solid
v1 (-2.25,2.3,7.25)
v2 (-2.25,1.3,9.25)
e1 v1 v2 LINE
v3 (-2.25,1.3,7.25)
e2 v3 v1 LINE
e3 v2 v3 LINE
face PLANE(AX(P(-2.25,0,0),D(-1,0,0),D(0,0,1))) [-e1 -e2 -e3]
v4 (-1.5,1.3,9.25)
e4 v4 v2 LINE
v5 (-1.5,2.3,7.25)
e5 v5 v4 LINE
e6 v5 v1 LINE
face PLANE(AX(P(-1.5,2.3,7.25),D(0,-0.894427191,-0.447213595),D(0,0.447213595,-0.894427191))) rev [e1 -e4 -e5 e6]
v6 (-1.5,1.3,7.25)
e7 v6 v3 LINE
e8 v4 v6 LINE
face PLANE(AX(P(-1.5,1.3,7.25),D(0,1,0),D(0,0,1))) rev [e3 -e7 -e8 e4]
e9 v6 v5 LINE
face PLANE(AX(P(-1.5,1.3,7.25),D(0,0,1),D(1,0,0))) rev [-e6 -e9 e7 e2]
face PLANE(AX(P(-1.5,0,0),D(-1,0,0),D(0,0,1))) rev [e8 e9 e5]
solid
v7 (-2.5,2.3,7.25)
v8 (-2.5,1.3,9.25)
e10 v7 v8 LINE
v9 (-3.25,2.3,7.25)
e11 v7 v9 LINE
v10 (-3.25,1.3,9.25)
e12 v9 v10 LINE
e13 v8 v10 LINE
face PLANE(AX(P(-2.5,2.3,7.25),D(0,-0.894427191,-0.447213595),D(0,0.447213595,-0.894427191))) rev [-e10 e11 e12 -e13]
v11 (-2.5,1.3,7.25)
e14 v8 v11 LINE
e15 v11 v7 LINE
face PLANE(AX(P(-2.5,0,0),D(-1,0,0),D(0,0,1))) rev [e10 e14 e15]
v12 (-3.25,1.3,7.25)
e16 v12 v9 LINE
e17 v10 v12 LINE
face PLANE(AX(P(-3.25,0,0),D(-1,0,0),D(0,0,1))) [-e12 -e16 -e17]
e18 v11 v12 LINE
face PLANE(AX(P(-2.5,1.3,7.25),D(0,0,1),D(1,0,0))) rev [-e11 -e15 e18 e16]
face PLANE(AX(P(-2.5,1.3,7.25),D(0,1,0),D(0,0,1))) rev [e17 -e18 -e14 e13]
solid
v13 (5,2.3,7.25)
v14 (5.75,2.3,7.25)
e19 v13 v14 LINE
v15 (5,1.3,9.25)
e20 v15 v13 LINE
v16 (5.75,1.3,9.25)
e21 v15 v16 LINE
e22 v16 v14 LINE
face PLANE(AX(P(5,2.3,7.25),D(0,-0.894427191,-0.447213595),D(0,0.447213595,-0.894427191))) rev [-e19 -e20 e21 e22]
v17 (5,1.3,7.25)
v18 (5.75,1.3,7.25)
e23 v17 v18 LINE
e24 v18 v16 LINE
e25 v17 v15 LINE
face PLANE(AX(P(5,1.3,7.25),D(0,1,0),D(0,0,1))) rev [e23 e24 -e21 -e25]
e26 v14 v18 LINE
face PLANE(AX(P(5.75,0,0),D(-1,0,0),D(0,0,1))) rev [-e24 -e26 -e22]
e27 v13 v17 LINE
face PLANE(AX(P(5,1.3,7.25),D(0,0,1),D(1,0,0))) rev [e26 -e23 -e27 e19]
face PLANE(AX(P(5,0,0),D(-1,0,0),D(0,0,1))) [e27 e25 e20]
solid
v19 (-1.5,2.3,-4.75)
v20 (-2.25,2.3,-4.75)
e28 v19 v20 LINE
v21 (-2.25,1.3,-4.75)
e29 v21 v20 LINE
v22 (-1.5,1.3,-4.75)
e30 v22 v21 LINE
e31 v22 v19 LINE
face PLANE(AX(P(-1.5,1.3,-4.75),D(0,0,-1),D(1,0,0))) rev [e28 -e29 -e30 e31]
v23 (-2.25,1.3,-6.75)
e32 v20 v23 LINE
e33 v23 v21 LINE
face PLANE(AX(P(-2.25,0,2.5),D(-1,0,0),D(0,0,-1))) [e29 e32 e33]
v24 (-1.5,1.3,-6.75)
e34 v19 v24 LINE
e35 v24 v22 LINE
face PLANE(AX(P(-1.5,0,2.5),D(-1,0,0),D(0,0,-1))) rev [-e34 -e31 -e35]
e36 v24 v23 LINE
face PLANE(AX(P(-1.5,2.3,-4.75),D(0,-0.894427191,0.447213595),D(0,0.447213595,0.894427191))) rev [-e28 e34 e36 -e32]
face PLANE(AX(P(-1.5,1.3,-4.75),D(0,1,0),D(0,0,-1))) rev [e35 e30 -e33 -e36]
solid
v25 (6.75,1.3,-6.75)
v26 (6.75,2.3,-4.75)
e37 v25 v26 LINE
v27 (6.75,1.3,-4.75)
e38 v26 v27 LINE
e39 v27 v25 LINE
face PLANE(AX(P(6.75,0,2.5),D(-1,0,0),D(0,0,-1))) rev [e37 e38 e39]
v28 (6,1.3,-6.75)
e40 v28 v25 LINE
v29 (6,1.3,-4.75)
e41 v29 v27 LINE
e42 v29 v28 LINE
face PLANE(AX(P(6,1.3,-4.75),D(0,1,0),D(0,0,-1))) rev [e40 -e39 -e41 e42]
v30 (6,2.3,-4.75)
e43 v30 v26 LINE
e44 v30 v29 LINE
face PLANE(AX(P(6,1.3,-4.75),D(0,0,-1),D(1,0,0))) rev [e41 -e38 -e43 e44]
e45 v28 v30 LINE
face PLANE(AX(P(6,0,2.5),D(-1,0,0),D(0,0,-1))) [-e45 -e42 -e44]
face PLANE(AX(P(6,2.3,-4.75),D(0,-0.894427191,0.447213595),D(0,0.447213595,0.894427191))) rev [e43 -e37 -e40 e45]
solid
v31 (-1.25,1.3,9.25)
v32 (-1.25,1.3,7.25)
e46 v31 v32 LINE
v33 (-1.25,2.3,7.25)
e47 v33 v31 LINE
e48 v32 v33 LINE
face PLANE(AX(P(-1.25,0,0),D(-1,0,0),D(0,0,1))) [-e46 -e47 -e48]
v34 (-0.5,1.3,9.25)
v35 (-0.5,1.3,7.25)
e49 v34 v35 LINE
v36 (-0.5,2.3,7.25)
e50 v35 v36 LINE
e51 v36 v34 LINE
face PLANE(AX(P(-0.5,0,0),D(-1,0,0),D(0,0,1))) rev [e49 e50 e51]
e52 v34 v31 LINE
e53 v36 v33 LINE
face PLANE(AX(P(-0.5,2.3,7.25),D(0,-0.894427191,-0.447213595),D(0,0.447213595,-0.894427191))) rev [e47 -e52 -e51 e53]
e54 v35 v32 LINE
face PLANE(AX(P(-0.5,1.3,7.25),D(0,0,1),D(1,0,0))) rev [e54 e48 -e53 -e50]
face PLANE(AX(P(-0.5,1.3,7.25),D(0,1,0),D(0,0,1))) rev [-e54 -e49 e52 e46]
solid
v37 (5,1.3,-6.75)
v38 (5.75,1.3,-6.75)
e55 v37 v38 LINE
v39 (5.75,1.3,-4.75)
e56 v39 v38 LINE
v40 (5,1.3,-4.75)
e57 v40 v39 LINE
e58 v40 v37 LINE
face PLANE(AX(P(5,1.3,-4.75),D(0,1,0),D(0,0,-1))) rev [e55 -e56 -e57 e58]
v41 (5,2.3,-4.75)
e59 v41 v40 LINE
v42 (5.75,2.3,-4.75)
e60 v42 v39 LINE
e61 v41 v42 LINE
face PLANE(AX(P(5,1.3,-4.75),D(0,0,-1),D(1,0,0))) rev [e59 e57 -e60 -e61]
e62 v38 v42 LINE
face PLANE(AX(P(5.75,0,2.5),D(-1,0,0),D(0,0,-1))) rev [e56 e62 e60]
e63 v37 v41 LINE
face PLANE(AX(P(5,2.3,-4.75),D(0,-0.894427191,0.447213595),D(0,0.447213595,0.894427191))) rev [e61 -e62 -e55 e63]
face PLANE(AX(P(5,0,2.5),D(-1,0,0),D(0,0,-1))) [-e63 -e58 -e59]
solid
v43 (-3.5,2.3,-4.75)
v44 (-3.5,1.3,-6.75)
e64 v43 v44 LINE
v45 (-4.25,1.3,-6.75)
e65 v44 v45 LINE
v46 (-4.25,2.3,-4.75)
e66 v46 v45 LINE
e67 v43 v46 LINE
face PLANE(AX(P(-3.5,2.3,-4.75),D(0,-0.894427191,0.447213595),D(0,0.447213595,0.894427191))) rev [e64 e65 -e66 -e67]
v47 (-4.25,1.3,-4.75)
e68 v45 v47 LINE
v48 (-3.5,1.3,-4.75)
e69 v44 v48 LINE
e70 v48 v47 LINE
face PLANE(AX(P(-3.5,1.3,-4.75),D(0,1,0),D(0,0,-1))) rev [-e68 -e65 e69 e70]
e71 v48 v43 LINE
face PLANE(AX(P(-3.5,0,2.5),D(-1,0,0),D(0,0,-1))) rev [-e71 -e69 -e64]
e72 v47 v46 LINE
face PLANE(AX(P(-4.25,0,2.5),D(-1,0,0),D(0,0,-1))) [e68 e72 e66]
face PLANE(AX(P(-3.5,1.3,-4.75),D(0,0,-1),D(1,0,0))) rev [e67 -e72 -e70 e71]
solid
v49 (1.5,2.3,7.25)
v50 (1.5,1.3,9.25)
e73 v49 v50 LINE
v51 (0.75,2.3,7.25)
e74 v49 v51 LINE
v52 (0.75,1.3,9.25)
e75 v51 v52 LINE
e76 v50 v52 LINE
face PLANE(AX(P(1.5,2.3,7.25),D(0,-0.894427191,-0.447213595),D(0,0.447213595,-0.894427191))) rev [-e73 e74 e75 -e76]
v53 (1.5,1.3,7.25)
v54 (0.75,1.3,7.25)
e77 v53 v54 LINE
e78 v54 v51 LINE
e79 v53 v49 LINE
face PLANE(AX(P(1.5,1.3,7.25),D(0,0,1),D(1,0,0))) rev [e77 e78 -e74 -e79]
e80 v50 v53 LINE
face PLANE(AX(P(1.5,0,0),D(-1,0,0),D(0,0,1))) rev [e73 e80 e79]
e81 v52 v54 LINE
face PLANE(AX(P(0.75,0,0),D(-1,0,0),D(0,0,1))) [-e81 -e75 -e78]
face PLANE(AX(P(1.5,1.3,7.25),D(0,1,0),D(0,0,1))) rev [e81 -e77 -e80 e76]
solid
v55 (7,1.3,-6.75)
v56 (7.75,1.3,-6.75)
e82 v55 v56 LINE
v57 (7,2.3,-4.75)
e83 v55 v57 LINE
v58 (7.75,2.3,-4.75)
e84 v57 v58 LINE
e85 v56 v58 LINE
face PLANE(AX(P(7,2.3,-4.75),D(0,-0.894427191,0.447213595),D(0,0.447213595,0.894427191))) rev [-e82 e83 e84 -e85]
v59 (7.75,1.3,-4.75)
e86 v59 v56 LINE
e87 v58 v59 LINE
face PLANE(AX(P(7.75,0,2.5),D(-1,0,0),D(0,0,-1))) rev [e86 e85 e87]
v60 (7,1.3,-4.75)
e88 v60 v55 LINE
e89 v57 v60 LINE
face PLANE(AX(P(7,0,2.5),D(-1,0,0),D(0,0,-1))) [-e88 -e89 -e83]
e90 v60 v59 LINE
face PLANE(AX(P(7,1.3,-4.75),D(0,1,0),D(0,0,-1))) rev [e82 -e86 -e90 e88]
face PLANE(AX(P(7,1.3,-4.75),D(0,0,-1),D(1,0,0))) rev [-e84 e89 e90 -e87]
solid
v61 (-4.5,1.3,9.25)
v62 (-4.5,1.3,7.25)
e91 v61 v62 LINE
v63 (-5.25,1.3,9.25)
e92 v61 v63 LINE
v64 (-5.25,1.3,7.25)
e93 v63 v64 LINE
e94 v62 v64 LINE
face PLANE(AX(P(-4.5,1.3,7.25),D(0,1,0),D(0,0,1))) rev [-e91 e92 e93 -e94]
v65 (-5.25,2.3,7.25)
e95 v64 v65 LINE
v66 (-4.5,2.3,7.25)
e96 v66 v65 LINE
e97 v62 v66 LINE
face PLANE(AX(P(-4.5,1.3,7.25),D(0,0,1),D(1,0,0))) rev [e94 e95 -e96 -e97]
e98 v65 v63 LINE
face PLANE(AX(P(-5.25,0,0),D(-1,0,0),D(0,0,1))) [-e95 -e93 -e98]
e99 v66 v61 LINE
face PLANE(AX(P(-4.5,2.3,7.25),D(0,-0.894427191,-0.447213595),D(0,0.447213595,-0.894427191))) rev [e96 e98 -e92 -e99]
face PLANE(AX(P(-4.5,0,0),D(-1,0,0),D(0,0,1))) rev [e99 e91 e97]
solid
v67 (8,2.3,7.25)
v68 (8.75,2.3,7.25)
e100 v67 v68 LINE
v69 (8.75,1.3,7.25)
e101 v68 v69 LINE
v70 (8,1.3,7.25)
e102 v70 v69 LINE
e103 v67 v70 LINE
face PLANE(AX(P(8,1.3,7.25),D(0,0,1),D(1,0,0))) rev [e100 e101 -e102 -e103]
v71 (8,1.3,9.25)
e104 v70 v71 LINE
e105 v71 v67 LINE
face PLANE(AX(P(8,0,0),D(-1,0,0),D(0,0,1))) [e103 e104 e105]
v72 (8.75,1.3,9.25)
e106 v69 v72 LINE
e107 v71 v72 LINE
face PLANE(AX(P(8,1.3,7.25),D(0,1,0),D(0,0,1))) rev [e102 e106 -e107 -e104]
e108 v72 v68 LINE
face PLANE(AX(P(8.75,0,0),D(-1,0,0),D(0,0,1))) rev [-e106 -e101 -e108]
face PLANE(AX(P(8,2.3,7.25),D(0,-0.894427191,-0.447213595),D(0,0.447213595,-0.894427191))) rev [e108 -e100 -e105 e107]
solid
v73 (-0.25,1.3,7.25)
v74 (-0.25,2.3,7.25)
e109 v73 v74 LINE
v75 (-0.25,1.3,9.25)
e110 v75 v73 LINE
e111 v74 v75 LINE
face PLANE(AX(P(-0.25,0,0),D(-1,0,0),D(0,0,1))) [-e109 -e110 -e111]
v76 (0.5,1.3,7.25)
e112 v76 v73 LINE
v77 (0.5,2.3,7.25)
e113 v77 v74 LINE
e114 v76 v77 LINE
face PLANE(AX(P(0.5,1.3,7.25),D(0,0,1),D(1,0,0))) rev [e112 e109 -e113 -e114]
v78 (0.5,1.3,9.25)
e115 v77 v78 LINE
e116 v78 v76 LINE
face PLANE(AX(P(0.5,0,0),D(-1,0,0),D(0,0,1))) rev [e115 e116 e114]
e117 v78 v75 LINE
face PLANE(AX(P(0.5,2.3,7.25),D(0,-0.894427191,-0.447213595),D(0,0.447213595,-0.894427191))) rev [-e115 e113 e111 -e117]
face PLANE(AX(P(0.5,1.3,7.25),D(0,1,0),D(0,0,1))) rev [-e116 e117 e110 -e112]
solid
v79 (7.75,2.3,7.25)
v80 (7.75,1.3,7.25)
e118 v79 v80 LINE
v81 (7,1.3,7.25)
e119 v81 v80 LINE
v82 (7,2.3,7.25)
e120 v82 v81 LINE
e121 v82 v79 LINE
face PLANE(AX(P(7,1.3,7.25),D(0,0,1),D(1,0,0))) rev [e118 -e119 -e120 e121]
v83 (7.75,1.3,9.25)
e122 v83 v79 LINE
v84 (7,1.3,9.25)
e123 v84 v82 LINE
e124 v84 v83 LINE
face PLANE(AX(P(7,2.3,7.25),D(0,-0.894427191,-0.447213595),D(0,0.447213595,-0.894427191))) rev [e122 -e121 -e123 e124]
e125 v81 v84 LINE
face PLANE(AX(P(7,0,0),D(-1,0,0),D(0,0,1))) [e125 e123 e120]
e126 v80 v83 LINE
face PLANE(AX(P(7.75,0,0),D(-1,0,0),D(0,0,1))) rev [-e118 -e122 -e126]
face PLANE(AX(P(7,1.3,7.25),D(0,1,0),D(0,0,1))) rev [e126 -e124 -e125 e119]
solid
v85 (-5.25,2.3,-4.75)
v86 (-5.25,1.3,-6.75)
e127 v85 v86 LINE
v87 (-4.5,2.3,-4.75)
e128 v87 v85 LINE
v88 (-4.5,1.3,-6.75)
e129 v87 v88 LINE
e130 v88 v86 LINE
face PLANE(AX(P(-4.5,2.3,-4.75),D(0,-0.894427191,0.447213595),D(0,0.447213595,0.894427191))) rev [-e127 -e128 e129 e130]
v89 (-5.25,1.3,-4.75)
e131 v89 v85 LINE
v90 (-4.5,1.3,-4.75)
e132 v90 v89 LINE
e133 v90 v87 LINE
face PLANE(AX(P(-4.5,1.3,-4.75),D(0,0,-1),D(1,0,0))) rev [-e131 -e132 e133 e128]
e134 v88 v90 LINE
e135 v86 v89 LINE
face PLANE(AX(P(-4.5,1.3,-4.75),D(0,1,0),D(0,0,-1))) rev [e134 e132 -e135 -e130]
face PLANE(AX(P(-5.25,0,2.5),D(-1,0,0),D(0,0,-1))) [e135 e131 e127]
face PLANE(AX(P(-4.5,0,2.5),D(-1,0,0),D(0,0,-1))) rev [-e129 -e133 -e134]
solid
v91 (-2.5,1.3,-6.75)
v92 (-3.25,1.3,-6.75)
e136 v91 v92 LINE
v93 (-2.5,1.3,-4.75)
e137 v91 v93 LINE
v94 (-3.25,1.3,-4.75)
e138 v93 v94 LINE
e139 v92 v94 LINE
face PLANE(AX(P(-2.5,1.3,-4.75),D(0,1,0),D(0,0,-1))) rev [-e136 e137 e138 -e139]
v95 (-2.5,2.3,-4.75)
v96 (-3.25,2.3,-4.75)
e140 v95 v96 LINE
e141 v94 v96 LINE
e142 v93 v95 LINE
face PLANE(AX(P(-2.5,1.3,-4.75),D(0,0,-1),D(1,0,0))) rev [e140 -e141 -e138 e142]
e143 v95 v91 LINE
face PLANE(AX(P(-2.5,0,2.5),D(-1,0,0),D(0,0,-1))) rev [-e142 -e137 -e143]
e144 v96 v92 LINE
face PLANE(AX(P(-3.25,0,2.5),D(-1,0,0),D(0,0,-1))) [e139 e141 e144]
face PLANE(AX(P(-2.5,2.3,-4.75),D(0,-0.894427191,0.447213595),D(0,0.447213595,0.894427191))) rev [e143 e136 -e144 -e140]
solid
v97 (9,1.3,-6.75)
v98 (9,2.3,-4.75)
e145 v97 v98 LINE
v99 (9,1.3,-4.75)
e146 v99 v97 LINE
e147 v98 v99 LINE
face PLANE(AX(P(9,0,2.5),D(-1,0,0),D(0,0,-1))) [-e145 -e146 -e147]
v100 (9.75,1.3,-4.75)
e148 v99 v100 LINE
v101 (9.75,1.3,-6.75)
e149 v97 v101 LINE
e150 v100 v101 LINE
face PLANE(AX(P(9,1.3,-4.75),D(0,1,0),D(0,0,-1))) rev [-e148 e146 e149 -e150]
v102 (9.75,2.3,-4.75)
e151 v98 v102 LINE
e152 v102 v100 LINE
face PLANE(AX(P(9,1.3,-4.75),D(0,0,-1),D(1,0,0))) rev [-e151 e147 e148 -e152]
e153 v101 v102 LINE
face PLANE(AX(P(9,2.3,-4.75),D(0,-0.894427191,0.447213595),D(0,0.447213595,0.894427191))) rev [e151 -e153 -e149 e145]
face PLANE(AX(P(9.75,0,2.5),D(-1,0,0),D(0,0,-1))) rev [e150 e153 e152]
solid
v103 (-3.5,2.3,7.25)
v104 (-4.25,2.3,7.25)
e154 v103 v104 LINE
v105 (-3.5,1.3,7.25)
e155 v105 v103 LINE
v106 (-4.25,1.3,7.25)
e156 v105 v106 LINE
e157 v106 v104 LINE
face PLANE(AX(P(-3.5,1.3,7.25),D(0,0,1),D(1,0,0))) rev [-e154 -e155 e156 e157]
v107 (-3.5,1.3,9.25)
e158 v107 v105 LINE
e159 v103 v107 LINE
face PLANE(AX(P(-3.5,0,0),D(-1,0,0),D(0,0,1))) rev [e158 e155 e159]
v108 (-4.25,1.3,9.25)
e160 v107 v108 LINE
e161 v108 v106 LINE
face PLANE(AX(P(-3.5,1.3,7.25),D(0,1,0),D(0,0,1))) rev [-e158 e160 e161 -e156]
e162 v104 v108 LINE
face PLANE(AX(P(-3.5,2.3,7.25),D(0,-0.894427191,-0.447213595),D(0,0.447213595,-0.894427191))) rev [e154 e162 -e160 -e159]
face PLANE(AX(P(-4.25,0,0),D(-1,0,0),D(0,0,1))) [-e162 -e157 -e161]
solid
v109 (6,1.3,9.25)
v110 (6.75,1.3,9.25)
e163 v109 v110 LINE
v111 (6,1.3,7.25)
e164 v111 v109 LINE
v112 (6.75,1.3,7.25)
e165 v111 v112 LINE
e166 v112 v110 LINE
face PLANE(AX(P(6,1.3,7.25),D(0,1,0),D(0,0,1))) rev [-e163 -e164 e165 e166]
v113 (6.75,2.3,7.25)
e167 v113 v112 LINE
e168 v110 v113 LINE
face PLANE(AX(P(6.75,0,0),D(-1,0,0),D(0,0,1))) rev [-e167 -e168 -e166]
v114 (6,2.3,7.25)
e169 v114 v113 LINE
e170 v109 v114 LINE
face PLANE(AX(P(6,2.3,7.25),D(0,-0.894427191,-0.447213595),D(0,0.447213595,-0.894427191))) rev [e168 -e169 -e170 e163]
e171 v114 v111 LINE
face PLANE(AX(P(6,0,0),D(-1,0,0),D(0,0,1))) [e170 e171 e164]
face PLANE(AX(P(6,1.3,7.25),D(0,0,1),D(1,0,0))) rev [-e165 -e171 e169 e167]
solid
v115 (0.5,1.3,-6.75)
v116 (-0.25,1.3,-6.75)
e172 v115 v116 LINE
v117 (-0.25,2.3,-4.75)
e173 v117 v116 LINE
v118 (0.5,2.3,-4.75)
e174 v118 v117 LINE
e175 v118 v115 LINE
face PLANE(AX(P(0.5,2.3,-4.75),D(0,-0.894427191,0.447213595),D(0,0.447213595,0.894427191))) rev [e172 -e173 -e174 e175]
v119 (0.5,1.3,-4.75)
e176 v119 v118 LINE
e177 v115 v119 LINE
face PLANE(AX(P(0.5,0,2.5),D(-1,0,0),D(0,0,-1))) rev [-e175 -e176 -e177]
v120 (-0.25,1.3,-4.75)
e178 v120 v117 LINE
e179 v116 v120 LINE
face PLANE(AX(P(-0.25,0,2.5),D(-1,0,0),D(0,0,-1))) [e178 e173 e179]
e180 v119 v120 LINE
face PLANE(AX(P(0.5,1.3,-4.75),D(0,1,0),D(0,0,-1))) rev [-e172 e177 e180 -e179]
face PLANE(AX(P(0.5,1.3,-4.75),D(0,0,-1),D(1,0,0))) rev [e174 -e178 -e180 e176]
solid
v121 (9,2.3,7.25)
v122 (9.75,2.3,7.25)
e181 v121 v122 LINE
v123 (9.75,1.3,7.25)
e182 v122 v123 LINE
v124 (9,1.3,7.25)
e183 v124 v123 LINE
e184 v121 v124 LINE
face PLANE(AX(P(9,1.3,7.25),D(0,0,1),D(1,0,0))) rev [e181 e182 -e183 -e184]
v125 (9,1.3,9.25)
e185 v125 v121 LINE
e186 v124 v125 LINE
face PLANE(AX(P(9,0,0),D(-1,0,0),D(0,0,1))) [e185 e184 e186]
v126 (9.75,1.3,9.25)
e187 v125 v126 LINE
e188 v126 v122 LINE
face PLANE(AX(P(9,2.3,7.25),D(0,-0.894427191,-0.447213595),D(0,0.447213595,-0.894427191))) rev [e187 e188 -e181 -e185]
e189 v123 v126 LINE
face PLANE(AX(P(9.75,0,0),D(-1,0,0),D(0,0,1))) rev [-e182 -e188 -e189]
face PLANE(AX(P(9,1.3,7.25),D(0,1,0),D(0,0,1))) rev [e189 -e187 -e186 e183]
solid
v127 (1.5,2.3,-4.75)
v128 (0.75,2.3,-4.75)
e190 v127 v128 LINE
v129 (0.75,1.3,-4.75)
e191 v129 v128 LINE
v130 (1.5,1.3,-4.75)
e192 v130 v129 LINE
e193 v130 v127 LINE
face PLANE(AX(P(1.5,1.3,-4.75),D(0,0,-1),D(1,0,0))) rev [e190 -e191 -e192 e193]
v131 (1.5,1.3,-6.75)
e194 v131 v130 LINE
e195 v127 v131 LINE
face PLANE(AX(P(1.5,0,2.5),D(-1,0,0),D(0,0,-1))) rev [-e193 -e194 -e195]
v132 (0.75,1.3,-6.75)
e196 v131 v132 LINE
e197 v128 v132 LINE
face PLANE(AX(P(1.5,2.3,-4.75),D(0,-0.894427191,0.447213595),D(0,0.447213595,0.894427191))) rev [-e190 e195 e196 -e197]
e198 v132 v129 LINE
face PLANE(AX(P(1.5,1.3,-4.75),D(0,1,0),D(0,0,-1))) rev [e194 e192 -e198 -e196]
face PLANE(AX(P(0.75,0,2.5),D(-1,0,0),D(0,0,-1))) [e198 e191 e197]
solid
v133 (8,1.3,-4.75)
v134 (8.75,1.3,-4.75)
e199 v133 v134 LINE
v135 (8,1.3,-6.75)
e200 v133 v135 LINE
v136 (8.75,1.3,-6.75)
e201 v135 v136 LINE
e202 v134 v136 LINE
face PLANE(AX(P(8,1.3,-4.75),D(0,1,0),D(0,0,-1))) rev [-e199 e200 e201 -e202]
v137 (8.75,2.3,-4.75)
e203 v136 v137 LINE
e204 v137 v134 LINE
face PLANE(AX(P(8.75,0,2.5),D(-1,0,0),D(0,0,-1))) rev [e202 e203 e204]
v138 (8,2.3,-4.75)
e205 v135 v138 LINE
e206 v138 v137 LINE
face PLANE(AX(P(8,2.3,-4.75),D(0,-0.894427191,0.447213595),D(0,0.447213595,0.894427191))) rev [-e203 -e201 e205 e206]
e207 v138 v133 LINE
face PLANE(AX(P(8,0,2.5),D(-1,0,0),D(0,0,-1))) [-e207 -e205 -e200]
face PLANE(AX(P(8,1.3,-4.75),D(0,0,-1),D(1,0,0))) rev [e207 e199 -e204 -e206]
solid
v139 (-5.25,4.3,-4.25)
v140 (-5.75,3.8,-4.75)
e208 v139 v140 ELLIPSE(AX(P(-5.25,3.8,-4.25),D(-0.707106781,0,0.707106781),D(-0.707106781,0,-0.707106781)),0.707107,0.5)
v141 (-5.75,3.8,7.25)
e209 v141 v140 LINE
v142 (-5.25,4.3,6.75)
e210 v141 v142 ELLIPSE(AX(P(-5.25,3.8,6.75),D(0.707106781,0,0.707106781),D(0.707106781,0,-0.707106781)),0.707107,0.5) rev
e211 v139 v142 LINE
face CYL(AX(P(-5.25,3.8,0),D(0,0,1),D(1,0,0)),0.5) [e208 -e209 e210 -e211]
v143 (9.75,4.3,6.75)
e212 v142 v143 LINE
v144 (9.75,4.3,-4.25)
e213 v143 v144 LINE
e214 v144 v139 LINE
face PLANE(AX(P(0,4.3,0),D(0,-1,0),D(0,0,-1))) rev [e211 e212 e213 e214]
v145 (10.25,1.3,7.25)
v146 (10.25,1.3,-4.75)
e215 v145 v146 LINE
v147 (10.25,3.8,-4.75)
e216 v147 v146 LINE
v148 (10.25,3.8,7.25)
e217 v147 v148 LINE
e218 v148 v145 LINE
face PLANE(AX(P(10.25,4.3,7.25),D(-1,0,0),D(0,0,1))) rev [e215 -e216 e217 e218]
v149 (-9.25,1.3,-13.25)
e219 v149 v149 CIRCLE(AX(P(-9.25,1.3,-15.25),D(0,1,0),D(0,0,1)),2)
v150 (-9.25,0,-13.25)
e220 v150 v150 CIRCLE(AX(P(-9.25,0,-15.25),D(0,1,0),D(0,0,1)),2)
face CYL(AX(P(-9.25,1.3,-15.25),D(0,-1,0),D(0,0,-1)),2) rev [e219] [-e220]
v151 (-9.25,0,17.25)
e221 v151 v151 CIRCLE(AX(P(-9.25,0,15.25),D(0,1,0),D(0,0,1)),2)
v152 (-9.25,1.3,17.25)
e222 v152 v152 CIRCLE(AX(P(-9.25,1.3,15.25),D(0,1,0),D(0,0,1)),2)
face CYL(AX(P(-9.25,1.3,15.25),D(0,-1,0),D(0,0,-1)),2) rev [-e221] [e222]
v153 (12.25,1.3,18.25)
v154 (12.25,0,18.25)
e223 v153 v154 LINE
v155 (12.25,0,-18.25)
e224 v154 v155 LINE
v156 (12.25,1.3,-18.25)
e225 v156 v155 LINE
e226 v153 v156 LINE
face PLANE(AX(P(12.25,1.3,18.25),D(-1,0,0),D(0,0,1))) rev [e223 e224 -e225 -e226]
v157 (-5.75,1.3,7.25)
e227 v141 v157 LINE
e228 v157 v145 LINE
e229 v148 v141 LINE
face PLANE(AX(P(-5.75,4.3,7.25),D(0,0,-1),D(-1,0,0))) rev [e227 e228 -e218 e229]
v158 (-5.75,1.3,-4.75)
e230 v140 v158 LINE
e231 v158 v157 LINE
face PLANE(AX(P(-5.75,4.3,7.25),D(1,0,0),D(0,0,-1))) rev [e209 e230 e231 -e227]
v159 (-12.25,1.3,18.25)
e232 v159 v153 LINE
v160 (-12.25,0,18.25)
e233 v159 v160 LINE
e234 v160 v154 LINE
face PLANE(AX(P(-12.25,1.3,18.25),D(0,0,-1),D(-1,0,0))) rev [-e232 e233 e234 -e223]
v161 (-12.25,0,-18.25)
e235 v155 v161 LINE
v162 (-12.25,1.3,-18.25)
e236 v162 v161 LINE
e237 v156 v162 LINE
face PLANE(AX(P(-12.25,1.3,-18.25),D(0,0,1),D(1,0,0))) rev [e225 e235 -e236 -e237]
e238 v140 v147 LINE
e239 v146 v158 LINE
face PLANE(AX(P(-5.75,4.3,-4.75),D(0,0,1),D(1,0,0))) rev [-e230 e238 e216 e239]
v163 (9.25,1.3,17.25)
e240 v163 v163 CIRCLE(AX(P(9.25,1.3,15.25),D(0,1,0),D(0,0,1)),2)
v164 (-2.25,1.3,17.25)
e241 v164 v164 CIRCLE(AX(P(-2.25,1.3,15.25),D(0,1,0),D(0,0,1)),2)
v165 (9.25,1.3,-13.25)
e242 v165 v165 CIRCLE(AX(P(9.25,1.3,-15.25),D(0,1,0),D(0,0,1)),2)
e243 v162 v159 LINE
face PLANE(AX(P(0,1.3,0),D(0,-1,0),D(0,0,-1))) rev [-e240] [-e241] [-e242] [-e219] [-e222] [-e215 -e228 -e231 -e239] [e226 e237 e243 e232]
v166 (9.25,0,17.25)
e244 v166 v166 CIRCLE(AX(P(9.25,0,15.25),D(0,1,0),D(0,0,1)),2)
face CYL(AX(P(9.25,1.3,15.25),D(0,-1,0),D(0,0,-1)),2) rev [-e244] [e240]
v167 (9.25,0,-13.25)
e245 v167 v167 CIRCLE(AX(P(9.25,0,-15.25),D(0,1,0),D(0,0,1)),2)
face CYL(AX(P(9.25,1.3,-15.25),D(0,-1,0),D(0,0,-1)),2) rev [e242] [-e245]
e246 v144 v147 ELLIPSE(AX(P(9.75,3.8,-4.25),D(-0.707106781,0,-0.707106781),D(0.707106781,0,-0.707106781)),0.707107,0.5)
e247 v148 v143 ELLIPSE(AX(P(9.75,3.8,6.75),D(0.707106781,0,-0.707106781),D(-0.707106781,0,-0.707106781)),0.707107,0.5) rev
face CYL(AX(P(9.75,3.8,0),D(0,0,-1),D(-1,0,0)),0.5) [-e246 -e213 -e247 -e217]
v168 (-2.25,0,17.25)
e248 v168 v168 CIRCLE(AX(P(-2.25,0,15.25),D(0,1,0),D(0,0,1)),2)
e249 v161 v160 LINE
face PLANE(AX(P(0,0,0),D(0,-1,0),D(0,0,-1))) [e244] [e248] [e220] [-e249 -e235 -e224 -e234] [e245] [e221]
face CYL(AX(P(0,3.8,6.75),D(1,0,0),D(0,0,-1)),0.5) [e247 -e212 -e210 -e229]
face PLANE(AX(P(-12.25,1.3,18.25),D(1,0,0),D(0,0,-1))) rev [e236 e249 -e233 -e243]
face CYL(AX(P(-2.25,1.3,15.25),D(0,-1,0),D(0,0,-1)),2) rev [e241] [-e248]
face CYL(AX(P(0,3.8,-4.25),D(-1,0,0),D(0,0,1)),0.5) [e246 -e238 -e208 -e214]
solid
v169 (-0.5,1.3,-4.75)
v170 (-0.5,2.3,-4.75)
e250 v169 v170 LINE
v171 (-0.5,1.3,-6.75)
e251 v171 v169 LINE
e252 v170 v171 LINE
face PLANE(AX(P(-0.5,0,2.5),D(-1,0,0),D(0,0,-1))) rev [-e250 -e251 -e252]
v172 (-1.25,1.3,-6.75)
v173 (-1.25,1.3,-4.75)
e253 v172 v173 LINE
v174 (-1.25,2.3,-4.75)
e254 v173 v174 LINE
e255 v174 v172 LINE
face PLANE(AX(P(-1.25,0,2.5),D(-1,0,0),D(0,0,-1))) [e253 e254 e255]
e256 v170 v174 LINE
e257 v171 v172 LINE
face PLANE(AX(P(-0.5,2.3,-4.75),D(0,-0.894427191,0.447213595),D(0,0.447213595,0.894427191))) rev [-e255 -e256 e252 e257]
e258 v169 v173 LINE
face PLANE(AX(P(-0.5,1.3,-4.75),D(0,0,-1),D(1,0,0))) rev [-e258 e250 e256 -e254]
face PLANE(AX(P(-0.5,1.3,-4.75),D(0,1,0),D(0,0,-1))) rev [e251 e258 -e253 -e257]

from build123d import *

# Parameters (mm, degrees)
CROQUIS1_W              = 24.5
CROQUIS1_H              = 36.5
CROQUIS1_R              = 2
SALIENTE_EXTRUIR1_DEPTH = 1.3
CROQUIS2_W              = 16
CROQUIS2_H              = 12
SALIENTE_EXTRUIR2_DEPTH = 3
REDONDEO1_R             = 0.5
CARTELA1_START          = 9
CARTELA1_DEPTH          = 0.75
MATRIZL5_COUNT          = 5
MATRIZL5_PITCH          = 1
CARTELA2_START          = -5.25
CARTELA2_DEPTH          = 0.75
MATRIZL6_COUNT          = 7
MATRIZL6_PITCH          = 1


# Read off the part's stored shape, not the designer's step: Cartela1, Cartela2
with BuildPart() as part:
    # Croquis1 → Saliente-Extruir1 (new body)
    with BuildSketch(Plane(origin=(0, 0, 0), x_dir=(1, 0, 0), z_dir=(0, 1, 0))):
        Rectangle(CROQUIS1_W, CROQUIS1_H)
        with Locations(Location((-9.25, 15.25, 0), (0, 0, 270))):
            Circle(CROQUIS1_R, mode=Mode.SUBTRACT)
        with Locations(Location((9.25, 15.25, 0), (0, 0, 270))):
            Circle(CROQUIS1_R, mode=Mode.SUBTRACT)
        with Locations(Location((9.25, -15.25, 0), (0, 0, 270))):
            Circle(CROQUIS1_R, mode=Mode.SUBTRACT)
        with Locations(Location((-9.25, -15.25, 0), (0, 0, 270))):
            Circle(CROQUIS1_R, mode=Mode.SUBTRACT)
        with Locations(Location((-2.25, -15.25, 0), (0, 0, 270))):
            Circle(CROQUIS1_R, mode=Mode.SUBTRACT)
    extrude(amount=SALIENTE_EXTRUIR1_DEPTH)

    # Croquis2 → Saliente-Extruir2 (add)
    with BuildSketch(Plane(origin=(0, 1.3, 0), x_dir=(1, 0, 0), z_dir=(0, 1, 0))):
        with Locations((2.25, -1.25)):
            Rectangle(CROQUIS2_W, CROQUIS2_H)
    extrude(amount=SALIENTE_EXTRUIR2_DEPTH)

    # Redondeo1
    redondeo1_edges = [part.edges().sort_by_distance(p)[0] for p in [
        (-5.75, 4.3, 1.25),
        (2.25, 4.3, 7.25),
        (10.25, 4.3, 1.25),
        (2.25, 4.3, -4.75),
    ]]
    fillet(redondeo1_edges, radius=REDONDEO1_R)


with BuildPart() as body_2:
    # Cartela1 outline → Cartela1 (new body)
    with BuildSketch(Plane.YZ.offset(CARTELA1_START)):
        Polygon((2.3, 7.25), (1.3, 9.25), (1.3, 7.25), align=None)
    extrude(amount=CARTELA1_DEPTH)


with BuildPart() as matrizl5_1:
    # MatrizL5: pattern copy
    add(body_2.part.moved(Location(Vector(-1, 0, 0) * (1 * MATRIZL5_PITCH))))


with BuildPart() as matrizl5_2:
    # MatrizL5: pattern copy
    add(body_2.part.moved(Location(Vector(-1, 0, 0) * (2 * MATRIZL5_PITCH))))


with BuildPart() as matrizl5_3:
    # MatrizL5: pattern copy
    add(body_2.part.moved(Location(Vector(-1, 0, 0) * (3 * MATRIZL5_PITCH))))


with BuildPart() as matrizl5_4:
    # MatrizL5: pattern copy
    add(body_2.part.moved(Location(Vector(-1, 0, 0) * (4 * MATRIZL5_PITCH))))


with BuildPart() as body_7:
    # Cartela2 outline → Cartela2 (new body)
    with BuildSketch(Plane.YZ.offset(CARTELA2_START)):
        Polygon((2.3, 7.25), (1.3, 9.25), (1.3, 7.25), align=None)
    extrude(amount=CARTELA2_DEPTH)


with BuildPart() as matrizl6_1:
    # MatrizL6: pattern copy
    add(body_7.part.moved(Location(Vector(1, 0, 0) * (1 * MATRIZL6_PITCH))))


with BuildPart() as matrizl6_2:
    # MatrizL6: pattern copy
    add(body_7.part.moved(Location(Vector(1, 0, 0) * (2 * MATRIZL6_PITCH))))


with BuildPart() as matrizl6_3:
    # MatrizL6: pattern copy
    add(body_7.part.moved(Location(Vector(1, 0, 0) * (3 * MATRIZL6_PITCH))))


with BuildPart() as matrizl6_4:
    # MatrizL6: pattern copy
    add(body_7.part.moved(Location(Vector(1, 0, 0) * (4 * MATRIZL6_PITCH))))


with BuildPart() as matrizl6_5:
    # MatrizL6: pattern copy
    add(body_7.part.moved(Location(Vector(1, 0, 0) * (5 * MATRIZL6_PITCH))))


with BuildPart() as matrizl6_6:
    # MatrizL6: pattern copy
    add(body_7.part.moved(Location(Vector(1, 0, 0) * (6 * MATRIZL6_PITCH))))


with BuildPart() as body_14:
    # Simetría1: mirrored copy
    add(body_7.part.mirror(Plane.XY.offset(1.25)))


with BuildPart() as body_15:
    # Simetr_a1 2: mirrored copy
    add(matrizl6_1.part.mirror(Plane.XY.offset(1.25)))


with BuildPart() as body_16:
    # Simetr_a1 3: mirrored copy
    add(matrizl6_2.part.mirror(Plane.XY.offset(1.25)))


with BuildPart() as body_17:
    # Simetr_a1 4: mirrored copy
    add(matrizl6_3.part.mirror(Plane.XY.offset(1.25)))


with BuildPart() as body_18:
    # Simetr_a1 5: mirrored copy
    add(matrizl6_4.part.mirror(Plane.XY.offset(1.25)))


with BuildPart() as body_19:
    # Simetr_a1 6: mirrored copy
    add(matrizl6_5.part.mirror(Plane.XY.offset(1.25)))


with BuildPart() as body_20:
    # Simetr_a1 7: mirrored copy
    add(matrizl6_6.part.mirror(Plane.XY.offset(1.25)))


with BuildPart() as body_21:
    # Simetr_a1 8: mirrored copy
    add(matrizl5_4.part.mirror(Plane.XY.offset(1.25)))


with BuildPart() as body_22:
    # Simetr_a1 9: mirrored copy
    add(matrizl5_3.part.mirror(Plane.XY.offset(1.25)))


with BuildPart() as body_23:
    # Simetr_a1 10: mirrored copy
    add(matrizl5_1.part.mirror(Plane.XY.offset(1.25)))


with BuildPart() as body_24:
    # Simetr_a1 11: mirrored copy
    add(matrizl5_2.part.mirror(Plane.XY.offset(1.25)))


with BuildPart() as body_25:
    # Simetr_a1 12: mirrored copy
    add(body_2.part.mirror(Plane.XY.offset(1.25)))


solid = Compound([part.part, body_2.part, matrizl5_1.part, matrizl5_2.part, matrizl5_3.part, matrizl5_4.part, body_7.part, matrizl6_1.part, matrizl6_2.part, matrizl6_3.part, matrizl6_4.part, matrizl6_5.part, matrizl6_6.part, body_14.part, body_15.part, body_16.part, body_17.part, body_18.part, body_19.part, body_20.part, body_21.part, body_22.part, body_23.part, body_24.part, body_25.part])
